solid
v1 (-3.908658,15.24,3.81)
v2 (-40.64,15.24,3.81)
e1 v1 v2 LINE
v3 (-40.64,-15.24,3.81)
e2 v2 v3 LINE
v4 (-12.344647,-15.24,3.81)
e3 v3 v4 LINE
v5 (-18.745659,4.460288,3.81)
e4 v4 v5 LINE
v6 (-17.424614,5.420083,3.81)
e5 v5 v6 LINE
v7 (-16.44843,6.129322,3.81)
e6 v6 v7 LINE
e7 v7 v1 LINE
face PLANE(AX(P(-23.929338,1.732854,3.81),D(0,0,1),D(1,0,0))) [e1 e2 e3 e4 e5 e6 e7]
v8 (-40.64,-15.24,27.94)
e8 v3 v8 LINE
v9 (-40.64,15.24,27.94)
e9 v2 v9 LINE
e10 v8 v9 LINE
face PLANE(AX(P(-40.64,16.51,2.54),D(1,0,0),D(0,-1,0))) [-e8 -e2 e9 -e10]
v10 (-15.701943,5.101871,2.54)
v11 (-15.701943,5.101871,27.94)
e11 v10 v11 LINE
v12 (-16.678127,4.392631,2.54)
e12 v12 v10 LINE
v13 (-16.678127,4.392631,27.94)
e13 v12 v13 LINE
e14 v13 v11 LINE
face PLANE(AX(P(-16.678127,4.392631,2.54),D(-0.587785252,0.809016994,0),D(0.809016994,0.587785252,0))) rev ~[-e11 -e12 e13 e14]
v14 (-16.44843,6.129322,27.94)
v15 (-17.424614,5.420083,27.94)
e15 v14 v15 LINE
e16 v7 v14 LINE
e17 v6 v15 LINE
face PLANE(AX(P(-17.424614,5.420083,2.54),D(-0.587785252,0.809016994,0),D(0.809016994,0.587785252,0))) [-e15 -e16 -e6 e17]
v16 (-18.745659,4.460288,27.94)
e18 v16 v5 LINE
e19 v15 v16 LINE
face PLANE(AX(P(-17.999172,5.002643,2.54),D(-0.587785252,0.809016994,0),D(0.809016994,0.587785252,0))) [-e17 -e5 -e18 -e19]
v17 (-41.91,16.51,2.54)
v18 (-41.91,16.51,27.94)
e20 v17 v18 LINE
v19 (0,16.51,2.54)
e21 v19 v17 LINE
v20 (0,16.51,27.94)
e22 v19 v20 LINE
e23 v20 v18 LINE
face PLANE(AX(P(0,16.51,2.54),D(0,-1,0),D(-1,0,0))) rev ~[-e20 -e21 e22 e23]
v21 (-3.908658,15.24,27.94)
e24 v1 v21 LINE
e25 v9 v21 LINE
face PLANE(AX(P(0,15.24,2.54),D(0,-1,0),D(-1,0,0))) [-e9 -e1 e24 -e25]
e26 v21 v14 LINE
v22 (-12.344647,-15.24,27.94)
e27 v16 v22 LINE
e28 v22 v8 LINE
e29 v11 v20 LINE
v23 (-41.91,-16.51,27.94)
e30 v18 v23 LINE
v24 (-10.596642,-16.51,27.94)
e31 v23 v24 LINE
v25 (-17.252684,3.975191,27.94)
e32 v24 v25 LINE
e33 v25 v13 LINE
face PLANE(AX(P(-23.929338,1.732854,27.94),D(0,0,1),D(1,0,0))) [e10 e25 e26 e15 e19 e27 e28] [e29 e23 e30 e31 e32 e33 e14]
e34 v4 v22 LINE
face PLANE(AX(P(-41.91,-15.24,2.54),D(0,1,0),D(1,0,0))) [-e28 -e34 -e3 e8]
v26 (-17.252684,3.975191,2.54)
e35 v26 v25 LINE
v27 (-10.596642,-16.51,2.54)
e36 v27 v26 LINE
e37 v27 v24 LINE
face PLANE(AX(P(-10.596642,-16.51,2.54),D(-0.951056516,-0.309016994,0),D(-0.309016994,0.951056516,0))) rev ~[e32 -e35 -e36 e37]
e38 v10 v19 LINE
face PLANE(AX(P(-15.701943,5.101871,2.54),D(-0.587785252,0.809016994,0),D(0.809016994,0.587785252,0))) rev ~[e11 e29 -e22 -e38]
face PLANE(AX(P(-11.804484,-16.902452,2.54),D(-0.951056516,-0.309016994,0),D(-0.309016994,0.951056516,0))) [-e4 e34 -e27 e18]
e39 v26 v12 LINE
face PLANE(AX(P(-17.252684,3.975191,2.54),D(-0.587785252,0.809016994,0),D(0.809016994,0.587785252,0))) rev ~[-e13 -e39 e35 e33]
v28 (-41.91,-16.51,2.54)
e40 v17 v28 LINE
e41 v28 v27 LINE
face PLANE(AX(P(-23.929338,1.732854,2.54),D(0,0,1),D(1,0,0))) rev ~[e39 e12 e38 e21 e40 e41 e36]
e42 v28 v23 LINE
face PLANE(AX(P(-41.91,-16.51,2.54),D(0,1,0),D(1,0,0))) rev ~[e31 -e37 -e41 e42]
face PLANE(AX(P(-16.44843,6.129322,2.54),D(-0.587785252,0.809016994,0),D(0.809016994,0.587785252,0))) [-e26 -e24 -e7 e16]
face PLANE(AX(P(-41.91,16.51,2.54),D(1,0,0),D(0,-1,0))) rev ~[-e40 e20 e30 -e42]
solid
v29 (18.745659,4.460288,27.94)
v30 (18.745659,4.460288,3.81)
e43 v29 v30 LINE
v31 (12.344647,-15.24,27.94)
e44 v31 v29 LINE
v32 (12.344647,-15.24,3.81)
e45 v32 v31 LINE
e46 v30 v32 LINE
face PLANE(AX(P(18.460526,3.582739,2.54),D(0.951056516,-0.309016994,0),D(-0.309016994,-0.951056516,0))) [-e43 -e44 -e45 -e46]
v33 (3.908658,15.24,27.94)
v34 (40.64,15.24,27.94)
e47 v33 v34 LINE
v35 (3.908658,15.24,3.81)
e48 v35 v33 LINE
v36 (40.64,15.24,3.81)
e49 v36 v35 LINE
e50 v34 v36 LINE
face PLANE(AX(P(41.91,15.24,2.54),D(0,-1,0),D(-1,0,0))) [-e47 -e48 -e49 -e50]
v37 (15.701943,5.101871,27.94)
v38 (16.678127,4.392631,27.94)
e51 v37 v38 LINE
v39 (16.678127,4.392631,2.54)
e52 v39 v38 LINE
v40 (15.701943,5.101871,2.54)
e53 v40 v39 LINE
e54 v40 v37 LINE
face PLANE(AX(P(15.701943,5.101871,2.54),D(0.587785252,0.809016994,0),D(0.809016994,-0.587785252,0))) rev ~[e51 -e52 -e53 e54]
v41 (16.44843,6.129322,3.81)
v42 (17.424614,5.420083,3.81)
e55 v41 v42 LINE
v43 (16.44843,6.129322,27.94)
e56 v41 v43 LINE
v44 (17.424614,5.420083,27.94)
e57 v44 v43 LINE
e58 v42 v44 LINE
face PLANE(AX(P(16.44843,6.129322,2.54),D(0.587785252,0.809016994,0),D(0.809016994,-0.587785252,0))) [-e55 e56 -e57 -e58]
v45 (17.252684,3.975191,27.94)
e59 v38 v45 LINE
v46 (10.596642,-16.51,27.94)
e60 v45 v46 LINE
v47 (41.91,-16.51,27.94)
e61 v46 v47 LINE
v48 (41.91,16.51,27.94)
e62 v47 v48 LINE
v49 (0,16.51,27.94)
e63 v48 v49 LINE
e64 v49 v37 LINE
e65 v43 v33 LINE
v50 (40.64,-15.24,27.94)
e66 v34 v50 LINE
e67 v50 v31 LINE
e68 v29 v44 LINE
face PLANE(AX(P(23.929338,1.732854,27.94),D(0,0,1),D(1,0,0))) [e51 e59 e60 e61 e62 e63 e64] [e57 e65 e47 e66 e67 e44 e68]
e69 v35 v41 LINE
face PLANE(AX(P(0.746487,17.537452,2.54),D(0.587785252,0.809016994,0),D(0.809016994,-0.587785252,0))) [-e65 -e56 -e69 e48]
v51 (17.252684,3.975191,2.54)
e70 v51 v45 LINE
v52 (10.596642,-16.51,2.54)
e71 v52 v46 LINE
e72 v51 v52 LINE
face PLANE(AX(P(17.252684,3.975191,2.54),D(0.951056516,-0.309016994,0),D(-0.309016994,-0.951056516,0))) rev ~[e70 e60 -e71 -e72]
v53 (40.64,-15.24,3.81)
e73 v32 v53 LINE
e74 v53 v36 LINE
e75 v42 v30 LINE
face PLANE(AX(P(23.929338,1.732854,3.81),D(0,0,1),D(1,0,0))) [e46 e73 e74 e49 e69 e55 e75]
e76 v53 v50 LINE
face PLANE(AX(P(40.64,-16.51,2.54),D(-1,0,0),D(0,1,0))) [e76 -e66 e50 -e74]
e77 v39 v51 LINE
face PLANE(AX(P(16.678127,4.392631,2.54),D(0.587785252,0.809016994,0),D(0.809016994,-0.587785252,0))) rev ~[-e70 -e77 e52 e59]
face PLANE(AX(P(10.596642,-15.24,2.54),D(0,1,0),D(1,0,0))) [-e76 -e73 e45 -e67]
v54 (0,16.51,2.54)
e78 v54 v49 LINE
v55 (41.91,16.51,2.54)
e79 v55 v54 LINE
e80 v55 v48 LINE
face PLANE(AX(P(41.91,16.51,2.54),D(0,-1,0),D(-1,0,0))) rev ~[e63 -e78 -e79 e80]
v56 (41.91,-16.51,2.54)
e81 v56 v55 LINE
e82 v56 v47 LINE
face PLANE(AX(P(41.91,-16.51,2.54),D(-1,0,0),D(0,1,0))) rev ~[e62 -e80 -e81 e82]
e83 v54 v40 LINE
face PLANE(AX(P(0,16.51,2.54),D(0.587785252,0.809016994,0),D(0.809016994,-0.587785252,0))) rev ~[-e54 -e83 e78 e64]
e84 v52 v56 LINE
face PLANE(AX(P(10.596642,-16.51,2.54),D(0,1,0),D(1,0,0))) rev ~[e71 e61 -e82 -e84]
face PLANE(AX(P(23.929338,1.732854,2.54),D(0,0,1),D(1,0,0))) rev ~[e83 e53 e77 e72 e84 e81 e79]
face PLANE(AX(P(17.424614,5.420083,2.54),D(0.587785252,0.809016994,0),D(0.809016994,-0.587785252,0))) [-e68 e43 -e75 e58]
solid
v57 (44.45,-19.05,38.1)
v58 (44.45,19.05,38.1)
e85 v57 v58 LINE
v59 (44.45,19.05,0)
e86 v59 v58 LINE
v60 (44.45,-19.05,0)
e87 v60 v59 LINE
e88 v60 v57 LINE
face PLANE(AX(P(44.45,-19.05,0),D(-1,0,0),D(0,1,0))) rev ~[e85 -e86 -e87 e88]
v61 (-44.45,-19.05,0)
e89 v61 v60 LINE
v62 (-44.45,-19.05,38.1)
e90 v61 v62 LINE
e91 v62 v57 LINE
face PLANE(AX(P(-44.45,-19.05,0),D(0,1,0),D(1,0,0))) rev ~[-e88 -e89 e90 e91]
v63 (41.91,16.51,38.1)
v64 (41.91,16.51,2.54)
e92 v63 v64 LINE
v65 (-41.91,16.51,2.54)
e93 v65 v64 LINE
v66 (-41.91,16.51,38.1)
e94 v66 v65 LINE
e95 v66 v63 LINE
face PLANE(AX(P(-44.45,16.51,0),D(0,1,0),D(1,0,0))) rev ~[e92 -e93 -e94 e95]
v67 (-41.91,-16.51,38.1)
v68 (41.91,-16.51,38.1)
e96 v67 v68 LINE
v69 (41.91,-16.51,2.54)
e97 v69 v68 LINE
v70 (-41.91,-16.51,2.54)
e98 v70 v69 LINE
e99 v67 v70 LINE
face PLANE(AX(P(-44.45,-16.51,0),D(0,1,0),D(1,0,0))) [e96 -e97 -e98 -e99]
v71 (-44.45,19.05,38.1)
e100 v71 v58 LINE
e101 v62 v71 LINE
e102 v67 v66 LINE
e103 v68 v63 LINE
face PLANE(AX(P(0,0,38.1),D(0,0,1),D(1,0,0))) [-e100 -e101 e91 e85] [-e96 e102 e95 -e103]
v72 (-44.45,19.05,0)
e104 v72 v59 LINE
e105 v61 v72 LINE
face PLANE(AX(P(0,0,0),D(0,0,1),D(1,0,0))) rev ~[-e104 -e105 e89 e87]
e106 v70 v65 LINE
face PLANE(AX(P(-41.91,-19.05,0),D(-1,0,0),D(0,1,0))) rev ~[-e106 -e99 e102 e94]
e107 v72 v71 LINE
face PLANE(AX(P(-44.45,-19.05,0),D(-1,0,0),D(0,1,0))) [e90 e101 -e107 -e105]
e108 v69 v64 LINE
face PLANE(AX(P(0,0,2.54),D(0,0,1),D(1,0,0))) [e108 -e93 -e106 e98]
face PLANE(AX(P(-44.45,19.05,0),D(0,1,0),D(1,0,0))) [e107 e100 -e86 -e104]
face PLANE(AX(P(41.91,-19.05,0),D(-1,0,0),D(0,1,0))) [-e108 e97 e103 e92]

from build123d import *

# Parameters (mm, degrees)
F0_W     = 88.9
F0_H     = 38.1
F1_DEPTH = 38.1
F2_T     = -2.54
F4_DEPTH = 25.4
F5_T     = -1.27
F6_T     = -1.27


with BuildPart() as f1:
    # F0 (on Top) → F1 (new body)
    with BuildSketch(Plane.XY):
        Rectangle(F0_W, F0_H)
    extrude(amount=F1_DEPTH)

    # F2
    f2_openings = [f1.faces().sort_by_distance(p)[0] for p in [
        (0, 0, 38.1),
    ]]
    offset(amount=F2_T, openings=f2_openings)


with BuildPart() as f4:
    # F3 (on face) → F4 (new body)
    with BuildSketch(Plane.XY.offset(2.54)):
        Polygon((-15.701943084, 5.1018705771), (0, 16.51), (-41.91, 16.51), (-41.91, -16.51), (-10.5966423781, -16.51), (-17.2526844283, 3.9751910406), (-16.6781271043, 4.3926313713), align=None)
    extrude(amount=F4_DEPTH)

    # F5
    f5_openings = [f4.faces().sort_by_distance(p)[0] for p in [
        (-26.606347, 0.679846, 27.94),
    ]]
    offset(amount=F5_T, openings=f5_openings, kind=Kind.INTERSECTION)


with BuildPart() as f4b:
    # F3 (on face) → F4, piece 2 (new body)
    with BuildSketch(Plane.XY.offset(2.54)):
        Polygon((41.91, 16.51), (0, 16.51), (15.701943084, 5.1018705771), (16.6781271043, 4.3926313713), (17.2526844283, 3.9751910406), (10.5966423781, -16.51), (41.91, -16.51), align=None)
    extrude(amount=F4_DEPTH)

    # F6
    f6_openings = [f4b.faces().sort_by_distance(p)[0] for p in [
        (26.606347, 0.679846, 27.94),
    ]]
    offset(amount=F6_T, openings=f6_openings, kind=Kind.INTERSECTION)


solid = Compound([f1.part, f4.part, f4b.part])
